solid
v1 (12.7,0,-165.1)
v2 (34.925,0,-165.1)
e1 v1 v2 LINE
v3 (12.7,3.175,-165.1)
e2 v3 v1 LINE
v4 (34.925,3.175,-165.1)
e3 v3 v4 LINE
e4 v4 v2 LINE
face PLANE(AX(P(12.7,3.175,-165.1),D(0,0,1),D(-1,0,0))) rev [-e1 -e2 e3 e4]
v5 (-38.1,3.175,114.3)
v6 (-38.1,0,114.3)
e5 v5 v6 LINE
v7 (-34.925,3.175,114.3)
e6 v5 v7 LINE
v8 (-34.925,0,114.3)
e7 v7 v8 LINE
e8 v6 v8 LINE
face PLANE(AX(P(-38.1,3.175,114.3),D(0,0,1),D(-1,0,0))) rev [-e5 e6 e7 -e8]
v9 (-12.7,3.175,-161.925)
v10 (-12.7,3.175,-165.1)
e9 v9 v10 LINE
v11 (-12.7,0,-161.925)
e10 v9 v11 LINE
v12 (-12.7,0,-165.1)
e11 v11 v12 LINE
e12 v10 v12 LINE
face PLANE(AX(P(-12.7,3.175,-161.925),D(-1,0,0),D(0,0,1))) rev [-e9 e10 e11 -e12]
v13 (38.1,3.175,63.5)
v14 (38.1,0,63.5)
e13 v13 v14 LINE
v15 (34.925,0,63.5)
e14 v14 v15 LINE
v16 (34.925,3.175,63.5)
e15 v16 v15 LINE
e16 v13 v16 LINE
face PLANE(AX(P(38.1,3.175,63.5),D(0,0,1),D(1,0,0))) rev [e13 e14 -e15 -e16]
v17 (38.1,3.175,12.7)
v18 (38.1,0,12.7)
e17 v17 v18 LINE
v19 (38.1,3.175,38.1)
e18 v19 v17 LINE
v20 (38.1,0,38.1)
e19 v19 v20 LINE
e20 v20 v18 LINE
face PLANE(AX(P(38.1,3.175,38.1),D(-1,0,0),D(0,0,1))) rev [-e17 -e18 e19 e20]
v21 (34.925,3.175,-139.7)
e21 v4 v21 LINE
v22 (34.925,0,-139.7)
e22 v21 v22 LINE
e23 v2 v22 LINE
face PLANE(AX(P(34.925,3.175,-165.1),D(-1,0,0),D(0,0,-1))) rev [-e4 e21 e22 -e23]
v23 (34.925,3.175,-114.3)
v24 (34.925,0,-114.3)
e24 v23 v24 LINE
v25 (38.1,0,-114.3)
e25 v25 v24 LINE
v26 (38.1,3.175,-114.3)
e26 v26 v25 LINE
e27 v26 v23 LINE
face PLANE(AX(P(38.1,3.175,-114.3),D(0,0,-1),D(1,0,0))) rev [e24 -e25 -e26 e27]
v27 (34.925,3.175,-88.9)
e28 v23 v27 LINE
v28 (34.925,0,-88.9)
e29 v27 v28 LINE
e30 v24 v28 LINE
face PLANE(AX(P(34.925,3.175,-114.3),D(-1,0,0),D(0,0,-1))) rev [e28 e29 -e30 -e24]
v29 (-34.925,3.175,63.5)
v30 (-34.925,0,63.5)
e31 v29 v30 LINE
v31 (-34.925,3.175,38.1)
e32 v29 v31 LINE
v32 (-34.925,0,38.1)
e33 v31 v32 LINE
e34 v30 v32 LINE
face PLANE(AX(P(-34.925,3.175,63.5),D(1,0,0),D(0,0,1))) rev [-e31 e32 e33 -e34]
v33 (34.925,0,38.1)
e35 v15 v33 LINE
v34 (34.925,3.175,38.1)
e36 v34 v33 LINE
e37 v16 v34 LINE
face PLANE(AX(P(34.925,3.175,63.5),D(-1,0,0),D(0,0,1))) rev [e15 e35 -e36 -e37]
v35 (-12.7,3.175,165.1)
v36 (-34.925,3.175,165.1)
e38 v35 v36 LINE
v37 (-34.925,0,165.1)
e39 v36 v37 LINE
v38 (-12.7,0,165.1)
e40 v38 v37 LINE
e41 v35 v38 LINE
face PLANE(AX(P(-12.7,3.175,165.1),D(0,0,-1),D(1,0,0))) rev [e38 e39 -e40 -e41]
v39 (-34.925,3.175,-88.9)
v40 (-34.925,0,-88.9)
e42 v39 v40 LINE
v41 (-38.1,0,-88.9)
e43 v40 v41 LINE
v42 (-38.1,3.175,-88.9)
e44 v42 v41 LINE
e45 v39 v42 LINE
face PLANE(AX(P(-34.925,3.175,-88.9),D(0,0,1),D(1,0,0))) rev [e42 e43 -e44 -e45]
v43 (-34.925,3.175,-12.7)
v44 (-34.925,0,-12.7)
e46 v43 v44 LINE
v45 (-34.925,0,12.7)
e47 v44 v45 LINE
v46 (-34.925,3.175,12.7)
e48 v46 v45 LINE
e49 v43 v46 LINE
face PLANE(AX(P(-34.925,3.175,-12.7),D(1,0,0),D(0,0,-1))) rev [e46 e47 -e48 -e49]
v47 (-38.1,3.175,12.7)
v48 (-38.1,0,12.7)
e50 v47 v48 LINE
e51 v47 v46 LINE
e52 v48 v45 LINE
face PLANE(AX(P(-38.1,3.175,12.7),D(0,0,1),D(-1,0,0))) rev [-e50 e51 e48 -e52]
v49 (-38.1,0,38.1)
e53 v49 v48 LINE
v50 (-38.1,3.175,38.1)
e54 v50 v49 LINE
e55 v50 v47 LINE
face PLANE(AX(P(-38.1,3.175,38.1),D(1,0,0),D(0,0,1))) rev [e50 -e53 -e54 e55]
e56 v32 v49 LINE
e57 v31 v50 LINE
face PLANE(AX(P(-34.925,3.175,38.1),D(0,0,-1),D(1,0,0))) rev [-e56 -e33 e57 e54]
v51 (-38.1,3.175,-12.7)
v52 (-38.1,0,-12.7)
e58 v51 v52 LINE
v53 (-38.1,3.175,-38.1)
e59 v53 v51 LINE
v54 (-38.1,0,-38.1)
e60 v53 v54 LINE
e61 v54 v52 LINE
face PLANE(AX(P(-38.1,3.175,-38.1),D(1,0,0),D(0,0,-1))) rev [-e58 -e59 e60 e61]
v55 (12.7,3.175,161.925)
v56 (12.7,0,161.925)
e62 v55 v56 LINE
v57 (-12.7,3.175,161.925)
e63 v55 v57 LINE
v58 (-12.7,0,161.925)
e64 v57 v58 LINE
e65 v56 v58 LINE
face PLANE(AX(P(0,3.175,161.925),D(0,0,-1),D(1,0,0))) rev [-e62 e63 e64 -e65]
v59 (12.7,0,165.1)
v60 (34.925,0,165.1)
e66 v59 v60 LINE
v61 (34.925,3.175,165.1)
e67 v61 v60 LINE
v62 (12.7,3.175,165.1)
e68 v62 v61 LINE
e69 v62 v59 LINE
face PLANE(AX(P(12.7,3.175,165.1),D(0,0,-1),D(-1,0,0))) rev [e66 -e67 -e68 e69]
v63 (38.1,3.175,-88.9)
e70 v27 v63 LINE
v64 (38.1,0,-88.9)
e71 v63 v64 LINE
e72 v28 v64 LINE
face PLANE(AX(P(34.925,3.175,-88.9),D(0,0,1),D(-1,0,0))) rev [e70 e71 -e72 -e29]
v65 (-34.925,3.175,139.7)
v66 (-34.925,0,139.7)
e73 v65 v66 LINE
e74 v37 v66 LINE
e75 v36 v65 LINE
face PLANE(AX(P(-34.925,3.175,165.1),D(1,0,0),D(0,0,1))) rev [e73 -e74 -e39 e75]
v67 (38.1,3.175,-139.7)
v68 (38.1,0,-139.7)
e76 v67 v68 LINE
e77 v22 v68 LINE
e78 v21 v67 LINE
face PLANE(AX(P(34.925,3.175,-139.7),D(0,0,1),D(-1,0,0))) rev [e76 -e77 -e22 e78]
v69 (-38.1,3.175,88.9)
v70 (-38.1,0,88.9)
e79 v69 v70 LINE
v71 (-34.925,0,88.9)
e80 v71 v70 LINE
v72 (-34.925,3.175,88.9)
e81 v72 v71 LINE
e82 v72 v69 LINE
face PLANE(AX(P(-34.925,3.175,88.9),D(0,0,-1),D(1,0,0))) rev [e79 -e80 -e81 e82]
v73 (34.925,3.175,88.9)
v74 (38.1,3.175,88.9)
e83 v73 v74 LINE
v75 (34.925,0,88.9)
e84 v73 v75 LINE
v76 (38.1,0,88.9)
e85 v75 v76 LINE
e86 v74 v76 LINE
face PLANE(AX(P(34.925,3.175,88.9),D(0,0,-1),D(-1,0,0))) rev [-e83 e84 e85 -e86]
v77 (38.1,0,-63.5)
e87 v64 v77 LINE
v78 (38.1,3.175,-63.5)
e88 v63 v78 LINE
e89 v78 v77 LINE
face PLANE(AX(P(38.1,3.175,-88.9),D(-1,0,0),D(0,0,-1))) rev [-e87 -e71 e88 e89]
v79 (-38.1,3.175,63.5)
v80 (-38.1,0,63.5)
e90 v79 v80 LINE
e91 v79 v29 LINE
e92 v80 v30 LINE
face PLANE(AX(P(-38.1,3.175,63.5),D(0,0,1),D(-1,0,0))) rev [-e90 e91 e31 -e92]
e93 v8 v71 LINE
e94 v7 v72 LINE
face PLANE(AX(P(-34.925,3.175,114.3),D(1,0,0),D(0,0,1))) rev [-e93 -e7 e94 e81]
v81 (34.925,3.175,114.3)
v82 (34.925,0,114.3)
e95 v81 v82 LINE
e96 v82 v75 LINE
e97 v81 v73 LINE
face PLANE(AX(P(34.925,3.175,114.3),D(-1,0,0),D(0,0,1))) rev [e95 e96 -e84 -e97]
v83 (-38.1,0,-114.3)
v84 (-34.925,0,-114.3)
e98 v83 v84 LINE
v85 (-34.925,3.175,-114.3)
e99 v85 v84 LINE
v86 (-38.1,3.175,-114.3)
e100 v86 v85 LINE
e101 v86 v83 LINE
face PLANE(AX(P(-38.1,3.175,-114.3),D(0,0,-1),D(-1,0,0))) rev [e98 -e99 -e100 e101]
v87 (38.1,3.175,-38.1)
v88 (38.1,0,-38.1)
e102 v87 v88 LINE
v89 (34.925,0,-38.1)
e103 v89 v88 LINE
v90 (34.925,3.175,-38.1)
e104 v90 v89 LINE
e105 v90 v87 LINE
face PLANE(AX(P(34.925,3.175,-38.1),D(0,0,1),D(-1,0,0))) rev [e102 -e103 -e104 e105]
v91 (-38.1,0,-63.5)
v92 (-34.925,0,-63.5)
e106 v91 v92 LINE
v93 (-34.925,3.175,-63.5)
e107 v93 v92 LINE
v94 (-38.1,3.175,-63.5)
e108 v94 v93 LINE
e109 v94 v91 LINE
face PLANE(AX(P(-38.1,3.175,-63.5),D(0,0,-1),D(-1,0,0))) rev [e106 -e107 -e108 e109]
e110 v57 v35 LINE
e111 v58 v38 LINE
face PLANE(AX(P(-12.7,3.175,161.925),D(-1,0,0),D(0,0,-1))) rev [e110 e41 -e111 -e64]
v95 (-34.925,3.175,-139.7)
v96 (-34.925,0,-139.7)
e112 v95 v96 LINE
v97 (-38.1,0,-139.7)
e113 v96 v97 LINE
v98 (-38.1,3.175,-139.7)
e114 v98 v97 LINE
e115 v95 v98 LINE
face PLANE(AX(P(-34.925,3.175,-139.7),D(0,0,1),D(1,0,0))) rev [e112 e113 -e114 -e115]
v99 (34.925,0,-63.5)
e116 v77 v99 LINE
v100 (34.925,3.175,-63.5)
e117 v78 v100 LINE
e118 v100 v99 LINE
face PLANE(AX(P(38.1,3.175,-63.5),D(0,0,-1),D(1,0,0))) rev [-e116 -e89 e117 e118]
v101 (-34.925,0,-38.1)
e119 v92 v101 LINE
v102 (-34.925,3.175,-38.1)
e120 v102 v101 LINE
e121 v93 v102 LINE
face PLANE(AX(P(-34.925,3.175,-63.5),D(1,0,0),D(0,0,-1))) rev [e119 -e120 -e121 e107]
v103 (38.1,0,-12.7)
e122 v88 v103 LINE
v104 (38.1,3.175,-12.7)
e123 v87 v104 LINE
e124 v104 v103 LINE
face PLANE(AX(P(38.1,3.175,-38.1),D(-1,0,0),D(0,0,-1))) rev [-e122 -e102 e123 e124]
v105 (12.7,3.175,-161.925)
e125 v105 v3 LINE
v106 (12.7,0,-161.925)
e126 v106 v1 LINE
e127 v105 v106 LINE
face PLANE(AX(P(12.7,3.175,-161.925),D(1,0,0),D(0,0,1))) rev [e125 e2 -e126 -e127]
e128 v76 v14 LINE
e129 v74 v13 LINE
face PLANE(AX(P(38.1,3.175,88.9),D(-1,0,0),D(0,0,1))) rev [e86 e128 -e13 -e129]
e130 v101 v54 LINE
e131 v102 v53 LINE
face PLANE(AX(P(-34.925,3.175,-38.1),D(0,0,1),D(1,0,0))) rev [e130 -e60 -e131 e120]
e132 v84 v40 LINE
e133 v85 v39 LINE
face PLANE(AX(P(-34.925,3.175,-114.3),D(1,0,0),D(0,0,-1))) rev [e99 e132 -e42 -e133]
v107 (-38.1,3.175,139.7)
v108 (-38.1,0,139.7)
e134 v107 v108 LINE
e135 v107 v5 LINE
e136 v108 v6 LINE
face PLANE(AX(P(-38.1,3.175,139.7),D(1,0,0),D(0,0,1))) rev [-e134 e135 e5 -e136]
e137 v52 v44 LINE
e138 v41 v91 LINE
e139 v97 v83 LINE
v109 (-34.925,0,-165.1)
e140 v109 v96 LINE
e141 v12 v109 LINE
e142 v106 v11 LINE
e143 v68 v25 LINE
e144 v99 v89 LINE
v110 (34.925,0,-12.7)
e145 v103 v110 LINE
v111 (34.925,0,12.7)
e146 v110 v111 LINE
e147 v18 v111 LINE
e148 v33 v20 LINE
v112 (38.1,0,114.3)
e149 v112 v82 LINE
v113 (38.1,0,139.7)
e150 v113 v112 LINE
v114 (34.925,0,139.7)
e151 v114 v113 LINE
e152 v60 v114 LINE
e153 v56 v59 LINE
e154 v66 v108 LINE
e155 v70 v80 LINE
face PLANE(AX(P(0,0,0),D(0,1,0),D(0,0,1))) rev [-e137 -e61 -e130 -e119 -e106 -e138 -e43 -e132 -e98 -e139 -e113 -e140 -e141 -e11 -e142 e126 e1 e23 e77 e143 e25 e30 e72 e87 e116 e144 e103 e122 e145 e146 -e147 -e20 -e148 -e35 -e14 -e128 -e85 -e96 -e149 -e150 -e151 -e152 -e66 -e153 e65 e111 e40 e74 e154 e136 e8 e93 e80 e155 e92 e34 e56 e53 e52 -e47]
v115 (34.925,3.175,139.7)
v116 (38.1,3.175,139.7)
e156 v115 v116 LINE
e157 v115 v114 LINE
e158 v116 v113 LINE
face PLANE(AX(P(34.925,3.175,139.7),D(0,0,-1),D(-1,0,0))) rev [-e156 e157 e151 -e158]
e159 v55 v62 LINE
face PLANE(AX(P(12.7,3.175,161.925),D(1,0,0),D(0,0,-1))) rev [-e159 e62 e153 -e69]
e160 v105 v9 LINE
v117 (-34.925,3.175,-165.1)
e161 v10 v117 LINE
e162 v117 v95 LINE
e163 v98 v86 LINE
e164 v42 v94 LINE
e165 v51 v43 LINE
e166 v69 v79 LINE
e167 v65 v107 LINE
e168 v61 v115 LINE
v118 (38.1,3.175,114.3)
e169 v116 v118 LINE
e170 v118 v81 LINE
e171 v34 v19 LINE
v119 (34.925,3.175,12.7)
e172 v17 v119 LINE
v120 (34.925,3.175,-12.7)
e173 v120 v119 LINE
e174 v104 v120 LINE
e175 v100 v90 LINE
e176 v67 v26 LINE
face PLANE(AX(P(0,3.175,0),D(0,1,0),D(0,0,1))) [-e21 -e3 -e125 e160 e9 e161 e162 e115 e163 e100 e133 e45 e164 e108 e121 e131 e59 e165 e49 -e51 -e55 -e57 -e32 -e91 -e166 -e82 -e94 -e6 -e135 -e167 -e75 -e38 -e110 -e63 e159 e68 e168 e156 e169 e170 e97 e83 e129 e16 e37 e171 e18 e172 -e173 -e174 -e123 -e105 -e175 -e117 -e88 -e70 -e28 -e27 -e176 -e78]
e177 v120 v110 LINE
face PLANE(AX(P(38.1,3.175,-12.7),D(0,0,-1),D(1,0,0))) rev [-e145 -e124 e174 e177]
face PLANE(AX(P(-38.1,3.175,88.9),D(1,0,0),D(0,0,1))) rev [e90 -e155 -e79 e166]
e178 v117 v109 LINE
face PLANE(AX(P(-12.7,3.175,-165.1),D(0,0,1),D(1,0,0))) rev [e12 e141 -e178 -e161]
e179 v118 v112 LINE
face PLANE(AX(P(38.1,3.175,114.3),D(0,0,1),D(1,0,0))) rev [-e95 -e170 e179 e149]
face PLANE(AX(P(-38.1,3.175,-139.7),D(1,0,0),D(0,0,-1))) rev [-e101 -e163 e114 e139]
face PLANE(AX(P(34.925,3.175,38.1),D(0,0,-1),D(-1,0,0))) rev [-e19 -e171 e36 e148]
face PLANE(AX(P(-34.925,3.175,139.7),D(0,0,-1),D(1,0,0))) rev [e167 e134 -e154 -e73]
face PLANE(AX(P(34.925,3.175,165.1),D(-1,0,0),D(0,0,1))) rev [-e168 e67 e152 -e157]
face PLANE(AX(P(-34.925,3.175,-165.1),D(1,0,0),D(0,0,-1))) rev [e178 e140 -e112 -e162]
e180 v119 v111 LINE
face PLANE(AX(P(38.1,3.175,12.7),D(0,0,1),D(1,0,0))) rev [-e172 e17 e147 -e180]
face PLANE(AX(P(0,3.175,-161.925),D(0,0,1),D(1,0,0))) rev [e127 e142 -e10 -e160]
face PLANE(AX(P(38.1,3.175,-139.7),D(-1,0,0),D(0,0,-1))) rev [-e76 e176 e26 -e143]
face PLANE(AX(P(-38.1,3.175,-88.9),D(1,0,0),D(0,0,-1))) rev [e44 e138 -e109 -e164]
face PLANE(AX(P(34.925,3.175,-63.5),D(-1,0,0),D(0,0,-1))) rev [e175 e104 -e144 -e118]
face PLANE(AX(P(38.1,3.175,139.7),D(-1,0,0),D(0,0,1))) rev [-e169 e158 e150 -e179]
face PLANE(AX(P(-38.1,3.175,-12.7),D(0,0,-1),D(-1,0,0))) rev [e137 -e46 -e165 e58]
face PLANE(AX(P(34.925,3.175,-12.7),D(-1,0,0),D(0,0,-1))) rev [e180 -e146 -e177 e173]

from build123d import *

# Parameters (mm, degrees)
BOSS_EXTRUDE1_DEPTH = 3.175
MIRROR1_START       = -161.925
MIRROR1_OUTLINE_W   = 69.85
MIRROR1_OUTLINE_H   = 3.175
MIRROR1_DEPTH       = 323.85
MIRROR1_START_2     = -165.1
MIRROR1_2_OUTLINE_W = 22.225
MIRROR1_2_OUTLINE_H = 3.175
MIRROR1_2_DEPTH     = 330.2
MIRROR1_START_3     = 12.7
MIRROR1_3_OUTLINE_W = 3.175
MIRROR1_3_OUTLINE_H = 3.175
MIRROR1_3_DEPTH     = 25.4
MIRROR1_START_4     = 63.5
MIRROR1_4_OUTLINE_W = 3.175
MIRROR1_4_OUTLINE_H = 3.175
MIRROR1_4_DEPTH     = 25.4
MIRROR1_START_5     = 114.3
MIRROR1_5_OUTLINE_W = 3.175
MIRROR1_5_OUTLINE_H = 3.175
MIRROR1_5_DEPTH     = 25.4
MIRROR1_START_6     = -139.7
MIRROR1_6_OUTLINE_W = 3.175
MIRROR1_6_OUTLINE_H = 3.175
MIRROR1_6_DEPTH     = 25.4
MIRROR1_START_7     = -88.9
MIRROR1_7_OUTLINE_W = 3.175
MIRROR1_7_OUTLINE_H = 3.175
MIRROR1_7_DEPTH     = 25.4
MIRROR1_START_8     = -38.1
MIRROR1_8_OUTLINE_W = 3.175
MIRROR1_8_OUTLINE_H = 3.175
MIRROR1_8_DEPTH     = 25.4


# Read off the part's stored shape, not the designer's step: Mirror1
with BuildPart() as part:
    # Sketch1 → Boss-Extrude1 (new body)
    with BuildSketch(Plane(origin=(0, 0, 0), x_dir=(1, 0, 0), z_dir=(0, 1, 0))):
        Polygon((0, 0), (0, 161.925), (-12.7, 161.925), (-12.7, 165.1), (-34.925, 165.1), (-34.925, 139.7), (-38.1, 139.7), (-38.1, 114.3), (-34.925, 114.3), (-34.925, 88.9), (-38.1, 88.9), (-38.1, 63.5), (-34.925, 63.5), (-34.925, 38.1), (-38.1, 38.1), (-38.1, 12.7), (-34.925, 12.7), (-34.925, 0), align=None)
    extrude(amount=BOSS_EXTRUDE1_DEPTH)

    # Mirror1 outline → Mirror1 (add)
    with BuildSketch(Plane.XY.offset(MIRROR1_START)):
        with Locations((0, 1.5875)):
            Rectangle(MIRROR1_OUTLINE_W, MIRROR1_OUTLINE_H)
    extrude(amount=MIRROR1_DEPTH)

    # Mirror1 2 outline → Mirror1 2 (add)
    with BuildSketch(Plane.XY.offset(MIRROR1_START_2)):
        with Locations((-23.8125, 1.5875)):
            Rectangle(MIRROR1_2_OUTLINE_W, MIRROR1_2_OUTLINE_H)
        with Locations((23.8125, 1.5875)):
            Rectangle(MIRROR1_2_OUTLINE_W, MIRROR1_2_OUTLINE_H)
    extrude(amount=MIRROR1_2_DEPTH)

    # Mirror1 3 outline → Mirror1 3 (add)
    with BuildSketch(Plane.XY.offset(MIRROR1_START_3)):
        with Locations((-36.5125, 1.5875)):
            Rectangle(MIRROR1_3_OUTLINE_W, MIRROR1_3_OUTLINE_H)
        with Locations((36.5125, 1.5875)):
            Rectangle(MIRROR1_3_OUTLINE_W, MIRROR1_3_OUTLINE_H)
    extrude(amount=MIRROR1_3_DEPTH)

    # Mirror1 4 outline → Mirror1 4 (add)
    with BuildSketch(Plane.XY.offset(MIRROR1_START_4)):
        with Locations((-36.5125, 1.5875)):
            Rectangle(MIRROR1_4_OUTLINE_W, MIRROR1_4_OUTLINE_H)
        with Locations((36.5125, 1.5875)):
            Rectangle(MIRROR1_4_OUTLINE_W, MIRROR1_4_OUTLINE_H)
    extrude(amount=MIRROR1_4_DEPTH)

    # Mirror1 5 outline → Mirror1 5 (add)
    with BuildSketch(Plane.XY.offset(MIRROR1_START_5)):
        with Locations((-36.5125, 1.5875)):
            Rectangle(MIRROR1_5_OUTLINE_W, MIRROR1_5_OUTLINE_H)
        with Locations((36.5125, 1.5875)):
            Rectangle(MIRROR1_5_OUTLINE_W, MIRROR1_5_OUTLINE_H)
    extrude(amount=MIRROR1_5_DEPTH)

    # Mirror1 6 outline → Mirror1 6 (add)
    with BuildSketch(Plane.XY.offset(MIRROR1_START_6)):
        with Locations((36.5125, 1.5875)):
            Rectangle(MIRROR1_6_OUTLINE_W, MIRROR1_6_OUTLINE_H)
    extrude(amount=MIRROR1_6_DEPTH)

    # Mirror1 7 outline → Mirror1 7 (add)
    with BuildSketch(Plane.XY.offset(MIRROR1_START_7)):
        with Locations((36.5125, 1.5875)):
            Rectangle(MIRROR1_7_OUTLINE_W, MIRROR1_7_OUTLINE_H)
    extrude(amount=MIRROR1_7_DEPTH)

    # Mirror1 8 outline → Mirror1 8 (add)
    with BuildSketch(Plane.XY.offset(MIRROR1_START_8)):
        with Locations((36.5125, 1.5875)):
            Rectangle(MIRROR1_8_OUTLINE_W, MIRROR1_8_OUTLINE_H)
    extrude(amount=MIRROR1_8_DEPTH)


solid = part.part
